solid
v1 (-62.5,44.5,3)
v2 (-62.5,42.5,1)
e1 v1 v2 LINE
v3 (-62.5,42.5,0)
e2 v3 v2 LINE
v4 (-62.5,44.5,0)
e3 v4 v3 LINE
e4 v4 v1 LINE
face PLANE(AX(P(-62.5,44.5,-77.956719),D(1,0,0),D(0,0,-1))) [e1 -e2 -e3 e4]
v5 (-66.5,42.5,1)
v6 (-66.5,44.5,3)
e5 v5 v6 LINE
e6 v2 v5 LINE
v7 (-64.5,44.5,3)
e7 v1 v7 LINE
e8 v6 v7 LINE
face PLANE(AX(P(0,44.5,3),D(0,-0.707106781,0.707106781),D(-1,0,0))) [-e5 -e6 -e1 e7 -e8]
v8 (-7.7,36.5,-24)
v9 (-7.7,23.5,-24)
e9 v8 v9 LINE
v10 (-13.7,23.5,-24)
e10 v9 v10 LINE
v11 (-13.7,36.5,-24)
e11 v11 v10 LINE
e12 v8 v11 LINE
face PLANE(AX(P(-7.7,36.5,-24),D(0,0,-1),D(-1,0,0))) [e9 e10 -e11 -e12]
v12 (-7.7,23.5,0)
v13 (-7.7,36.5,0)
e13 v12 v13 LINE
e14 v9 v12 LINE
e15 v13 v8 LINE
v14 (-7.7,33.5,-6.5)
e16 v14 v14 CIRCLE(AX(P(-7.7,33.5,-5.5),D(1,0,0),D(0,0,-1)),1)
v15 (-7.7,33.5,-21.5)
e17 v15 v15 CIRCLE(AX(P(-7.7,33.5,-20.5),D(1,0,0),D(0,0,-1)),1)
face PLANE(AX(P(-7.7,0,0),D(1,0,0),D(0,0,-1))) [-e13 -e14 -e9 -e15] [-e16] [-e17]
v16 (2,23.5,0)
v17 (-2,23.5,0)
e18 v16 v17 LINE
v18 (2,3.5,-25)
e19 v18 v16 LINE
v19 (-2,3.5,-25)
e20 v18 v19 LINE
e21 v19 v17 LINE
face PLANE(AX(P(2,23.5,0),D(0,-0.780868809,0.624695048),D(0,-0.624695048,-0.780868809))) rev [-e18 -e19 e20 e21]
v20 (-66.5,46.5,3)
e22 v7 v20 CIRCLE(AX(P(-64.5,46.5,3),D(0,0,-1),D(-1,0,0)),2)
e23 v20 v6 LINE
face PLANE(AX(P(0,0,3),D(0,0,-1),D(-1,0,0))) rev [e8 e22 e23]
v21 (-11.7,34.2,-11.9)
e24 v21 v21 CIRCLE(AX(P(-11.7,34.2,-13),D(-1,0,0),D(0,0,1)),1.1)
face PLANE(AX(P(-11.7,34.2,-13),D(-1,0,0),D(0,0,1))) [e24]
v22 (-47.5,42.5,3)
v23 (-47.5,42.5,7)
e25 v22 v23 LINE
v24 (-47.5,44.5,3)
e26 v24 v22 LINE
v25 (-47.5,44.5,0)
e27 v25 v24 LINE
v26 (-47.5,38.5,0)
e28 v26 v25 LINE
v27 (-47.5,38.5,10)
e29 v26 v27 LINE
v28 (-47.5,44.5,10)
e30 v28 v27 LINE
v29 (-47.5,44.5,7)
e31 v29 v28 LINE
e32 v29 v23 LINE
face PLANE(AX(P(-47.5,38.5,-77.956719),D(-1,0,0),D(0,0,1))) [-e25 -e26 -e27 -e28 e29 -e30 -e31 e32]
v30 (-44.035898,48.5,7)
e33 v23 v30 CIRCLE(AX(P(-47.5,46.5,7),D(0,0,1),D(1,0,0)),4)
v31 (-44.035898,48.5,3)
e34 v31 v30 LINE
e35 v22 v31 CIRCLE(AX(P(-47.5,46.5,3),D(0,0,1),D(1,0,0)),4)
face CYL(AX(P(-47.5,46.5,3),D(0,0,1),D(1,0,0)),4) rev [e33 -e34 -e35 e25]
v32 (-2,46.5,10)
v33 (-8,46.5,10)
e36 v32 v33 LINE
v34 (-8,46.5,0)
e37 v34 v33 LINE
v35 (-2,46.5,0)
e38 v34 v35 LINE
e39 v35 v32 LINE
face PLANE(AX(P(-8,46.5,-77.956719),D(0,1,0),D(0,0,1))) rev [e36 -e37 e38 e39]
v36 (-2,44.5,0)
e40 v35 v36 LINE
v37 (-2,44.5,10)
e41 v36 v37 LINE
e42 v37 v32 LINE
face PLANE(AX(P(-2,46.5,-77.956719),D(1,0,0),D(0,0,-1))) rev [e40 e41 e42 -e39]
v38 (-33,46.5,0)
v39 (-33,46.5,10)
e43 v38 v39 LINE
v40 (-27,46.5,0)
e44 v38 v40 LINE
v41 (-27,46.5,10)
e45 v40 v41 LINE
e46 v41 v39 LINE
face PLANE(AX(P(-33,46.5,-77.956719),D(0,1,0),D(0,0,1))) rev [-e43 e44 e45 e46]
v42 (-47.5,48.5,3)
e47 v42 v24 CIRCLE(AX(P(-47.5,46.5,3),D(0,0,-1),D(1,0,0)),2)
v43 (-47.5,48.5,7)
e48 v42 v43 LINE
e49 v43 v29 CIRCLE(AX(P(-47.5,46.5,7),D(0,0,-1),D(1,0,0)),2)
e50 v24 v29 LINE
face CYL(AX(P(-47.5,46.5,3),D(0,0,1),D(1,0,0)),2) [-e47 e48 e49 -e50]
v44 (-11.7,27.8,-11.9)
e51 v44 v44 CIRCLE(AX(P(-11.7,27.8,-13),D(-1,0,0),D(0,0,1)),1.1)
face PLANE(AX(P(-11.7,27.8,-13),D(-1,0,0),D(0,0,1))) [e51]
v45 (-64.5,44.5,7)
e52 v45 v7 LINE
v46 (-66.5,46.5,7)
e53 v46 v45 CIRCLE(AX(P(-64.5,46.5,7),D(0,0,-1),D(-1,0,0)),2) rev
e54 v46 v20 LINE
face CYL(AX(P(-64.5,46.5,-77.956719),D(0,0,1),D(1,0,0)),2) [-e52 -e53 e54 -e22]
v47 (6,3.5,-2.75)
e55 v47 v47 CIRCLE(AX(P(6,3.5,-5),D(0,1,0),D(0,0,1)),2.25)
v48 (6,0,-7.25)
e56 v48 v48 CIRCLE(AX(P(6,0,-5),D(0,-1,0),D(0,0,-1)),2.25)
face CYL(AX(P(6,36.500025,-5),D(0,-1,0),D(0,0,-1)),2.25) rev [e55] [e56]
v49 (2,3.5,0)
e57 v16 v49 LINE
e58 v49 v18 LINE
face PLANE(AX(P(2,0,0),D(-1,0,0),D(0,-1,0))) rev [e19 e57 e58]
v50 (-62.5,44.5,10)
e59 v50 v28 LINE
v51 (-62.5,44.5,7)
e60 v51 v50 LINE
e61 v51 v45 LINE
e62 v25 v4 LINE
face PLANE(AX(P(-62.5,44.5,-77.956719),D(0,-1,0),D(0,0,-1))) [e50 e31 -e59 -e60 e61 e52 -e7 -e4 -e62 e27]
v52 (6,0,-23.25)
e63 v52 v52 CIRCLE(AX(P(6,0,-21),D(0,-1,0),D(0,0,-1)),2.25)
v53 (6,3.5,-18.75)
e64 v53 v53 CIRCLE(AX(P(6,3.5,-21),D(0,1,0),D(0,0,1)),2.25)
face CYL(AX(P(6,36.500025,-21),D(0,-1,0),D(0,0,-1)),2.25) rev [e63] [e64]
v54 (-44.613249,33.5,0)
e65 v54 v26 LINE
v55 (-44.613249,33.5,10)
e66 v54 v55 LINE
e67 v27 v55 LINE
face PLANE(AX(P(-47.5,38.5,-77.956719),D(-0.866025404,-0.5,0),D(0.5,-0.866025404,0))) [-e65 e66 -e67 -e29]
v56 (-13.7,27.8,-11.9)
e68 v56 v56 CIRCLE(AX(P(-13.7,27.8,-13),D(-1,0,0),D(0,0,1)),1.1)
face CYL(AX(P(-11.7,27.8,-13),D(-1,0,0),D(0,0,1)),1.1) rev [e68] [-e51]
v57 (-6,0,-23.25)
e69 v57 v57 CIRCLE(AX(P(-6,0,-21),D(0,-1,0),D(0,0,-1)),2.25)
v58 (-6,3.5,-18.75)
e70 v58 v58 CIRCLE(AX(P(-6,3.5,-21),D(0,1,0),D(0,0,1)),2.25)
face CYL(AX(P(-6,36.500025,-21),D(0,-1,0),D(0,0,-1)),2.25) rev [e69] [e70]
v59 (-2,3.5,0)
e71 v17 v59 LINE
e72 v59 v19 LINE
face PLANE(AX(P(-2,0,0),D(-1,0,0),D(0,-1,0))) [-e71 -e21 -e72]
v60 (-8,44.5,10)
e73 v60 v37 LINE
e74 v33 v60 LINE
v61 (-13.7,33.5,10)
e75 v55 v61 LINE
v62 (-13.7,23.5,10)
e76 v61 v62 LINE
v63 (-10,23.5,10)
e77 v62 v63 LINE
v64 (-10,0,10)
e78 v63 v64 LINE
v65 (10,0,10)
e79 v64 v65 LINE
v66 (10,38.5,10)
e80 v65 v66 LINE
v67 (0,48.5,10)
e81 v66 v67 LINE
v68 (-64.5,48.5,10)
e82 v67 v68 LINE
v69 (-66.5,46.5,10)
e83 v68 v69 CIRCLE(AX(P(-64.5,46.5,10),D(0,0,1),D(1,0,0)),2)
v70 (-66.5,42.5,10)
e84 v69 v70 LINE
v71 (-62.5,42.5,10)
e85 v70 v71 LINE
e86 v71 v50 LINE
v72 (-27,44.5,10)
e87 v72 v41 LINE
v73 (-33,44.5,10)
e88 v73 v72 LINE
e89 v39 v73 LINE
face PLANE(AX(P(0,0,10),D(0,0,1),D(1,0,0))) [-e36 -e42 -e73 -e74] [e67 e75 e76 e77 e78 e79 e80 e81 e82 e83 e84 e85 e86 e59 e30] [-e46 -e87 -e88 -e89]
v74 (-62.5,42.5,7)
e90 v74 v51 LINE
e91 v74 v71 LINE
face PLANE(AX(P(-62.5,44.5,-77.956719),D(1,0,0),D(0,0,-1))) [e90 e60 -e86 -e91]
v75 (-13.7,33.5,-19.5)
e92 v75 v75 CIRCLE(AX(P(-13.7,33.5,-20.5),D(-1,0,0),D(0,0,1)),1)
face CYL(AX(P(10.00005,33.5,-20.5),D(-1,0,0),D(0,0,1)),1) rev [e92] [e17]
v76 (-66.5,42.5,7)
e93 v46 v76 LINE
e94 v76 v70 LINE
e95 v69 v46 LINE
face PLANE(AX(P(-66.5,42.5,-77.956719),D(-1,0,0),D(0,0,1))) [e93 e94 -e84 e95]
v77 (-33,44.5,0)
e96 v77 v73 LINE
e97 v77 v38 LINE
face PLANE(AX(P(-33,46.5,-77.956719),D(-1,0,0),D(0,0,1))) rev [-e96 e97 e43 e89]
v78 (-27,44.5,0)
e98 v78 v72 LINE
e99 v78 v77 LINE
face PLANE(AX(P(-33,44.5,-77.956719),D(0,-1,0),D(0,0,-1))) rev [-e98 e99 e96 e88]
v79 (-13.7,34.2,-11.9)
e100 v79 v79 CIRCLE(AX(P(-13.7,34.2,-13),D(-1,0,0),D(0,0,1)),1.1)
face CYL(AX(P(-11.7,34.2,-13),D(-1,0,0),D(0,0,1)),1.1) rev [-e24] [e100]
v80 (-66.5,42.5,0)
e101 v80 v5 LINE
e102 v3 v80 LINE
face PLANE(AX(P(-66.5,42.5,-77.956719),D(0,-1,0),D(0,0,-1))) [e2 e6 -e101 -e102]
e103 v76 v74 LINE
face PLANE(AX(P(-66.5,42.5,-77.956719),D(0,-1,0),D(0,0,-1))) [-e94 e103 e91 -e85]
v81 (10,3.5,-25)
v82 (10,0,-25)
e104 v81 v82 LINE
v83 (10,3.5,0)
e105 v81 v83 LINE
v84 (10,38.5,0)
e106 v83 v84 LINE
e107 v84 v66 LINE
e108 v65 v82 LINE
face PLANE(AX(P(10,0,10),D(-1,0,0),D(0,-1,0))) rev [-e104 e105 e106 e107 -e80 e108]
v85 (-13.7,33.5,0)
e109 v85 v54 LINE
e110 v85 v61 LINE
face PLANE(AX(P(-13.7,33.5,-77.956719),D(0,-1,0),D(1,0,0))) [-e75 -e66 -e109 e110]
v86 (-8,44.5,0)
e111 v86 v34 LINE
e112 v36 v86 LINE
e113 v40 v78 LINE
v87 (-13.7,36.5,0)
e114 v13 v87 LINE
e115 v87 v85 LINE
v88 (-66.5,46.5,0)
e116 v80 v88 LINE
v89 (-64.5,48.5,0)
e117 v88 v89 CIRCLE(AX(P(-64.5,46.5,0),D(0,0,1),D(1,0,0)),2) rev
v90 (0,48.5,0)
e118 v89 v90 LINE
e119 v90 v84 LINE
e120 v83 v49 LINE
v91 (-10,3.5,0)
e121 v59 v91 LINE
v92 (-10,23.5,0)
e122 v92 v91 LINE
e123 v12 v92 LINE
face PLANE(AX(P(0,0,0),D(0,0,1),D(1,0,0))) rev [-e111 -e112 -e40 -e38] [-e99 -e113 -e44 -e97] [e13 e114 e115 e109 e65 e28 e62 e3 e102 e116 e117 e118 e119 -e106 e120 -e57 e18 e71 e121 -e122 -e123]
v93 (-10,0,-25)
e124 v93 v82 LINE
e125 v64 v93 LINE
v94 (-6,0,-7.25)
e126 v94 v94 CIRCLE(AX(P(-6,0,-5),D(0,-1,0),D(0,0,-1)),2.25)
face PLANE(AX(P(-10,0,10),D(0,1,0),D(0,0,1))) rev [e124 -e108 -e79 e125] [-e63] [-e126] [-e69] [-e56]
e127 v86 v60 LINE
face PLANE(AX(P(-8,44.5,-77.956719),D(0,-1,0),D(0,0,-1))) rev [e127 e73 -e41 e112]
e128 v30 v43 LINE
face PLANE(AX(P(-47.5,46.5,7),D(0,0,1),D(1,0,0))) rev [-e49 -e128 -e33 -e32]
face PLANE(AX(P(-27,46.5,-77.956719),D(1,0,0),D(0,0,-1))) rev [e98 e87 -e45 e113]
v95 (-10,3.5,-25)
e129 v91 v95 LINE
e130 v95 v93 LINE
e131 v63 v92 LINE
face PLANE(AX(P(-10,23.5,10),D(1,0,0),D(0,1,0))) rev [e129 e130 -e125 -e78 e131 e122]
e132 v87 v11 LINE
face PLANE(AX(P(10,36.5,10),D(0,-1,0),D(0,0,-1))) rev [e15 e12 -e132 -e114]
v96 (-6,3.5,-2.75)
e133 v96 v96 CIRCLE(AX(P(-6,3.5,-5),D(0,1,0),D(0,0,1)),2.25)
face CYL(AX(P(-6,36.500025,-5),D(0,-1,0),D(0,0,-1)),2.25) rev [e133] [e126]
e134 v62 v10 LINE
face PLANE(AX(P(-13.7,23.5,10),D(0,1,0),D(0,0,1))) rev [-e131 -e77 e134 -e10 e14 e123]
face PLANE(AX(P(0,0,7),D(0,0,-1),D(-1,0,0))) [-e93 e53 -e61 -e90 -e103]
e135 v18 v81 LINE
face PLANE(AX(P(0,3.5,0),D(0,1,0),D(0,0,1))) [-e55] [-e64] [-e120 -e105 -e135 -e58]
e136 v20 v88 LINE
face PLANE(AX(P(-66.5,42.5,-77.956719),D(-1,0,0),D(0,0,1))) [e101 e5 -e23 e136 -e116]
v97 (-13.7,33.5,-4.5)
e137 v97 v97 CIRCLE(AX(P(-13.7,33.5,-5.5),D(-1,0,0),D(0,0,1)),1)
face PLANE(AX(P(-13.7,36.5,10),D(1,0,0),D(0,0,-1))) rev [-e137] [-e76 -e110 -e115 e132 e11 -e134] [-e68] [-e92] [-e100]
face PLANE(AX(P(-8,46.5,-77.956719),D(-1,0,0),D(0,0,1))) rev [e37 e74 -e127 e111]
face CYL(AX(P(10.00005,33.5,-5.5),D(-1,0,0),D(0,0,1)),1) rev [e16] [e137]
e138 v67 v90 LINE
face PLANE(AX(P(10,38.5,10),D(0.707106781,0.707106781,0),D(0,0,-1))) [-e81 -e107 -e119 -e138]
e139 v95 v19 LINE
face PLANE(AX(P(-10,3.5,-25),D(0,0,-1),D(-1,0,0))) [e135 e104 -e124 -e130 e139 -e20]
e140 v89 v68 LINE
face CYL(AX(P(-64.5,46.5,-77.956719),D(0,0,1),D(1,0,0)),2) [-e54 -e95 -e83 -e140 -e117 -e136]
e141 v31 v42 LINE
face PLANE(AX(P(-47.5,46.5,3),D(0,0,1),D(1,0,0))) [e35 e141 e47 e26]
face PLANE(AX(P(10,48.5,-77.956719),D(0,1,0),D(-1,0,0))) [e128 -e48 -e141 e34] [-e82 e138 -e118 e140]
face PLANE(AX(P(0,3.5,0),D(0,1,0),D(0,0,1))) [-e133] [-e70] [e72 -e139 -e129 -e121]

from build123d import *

# Parameters (mm, degrees)
BOSS_EXTRUDE1_DEPTH = 10
SKETCH6_W           = 20
SKETCH6_H           = 25
BOSS_EXTRUDE3_DEPTH = 3.5
SKETCH8_R           = 2.25
CUT_EXTRUDE2_DEPTH  = 47.313496953
SKETCH9_W           = 24
SKETCH9_H           = 13
BOSS_EXTRUDE4_DEPTH = 6
SKETCH10_R          = 1.1
CUT_EXTRUDE3_DEPTH  = 2
SKETCH11_R          = 1
CUT_EXTRUDE4_DEPTH  = 51.189042629
SKETCH12_W          = 6
SKETCH12_H          = 2
BOSS_EXTRUDE5_DEPTH = 10
SKETCH14_W          = 4
SKETCH14_H          = 2
CUT_EXTRUDE5_DEPTH  = 2
BOSS_EXTRUDE6_DEPTH = 2
FILLET1_R           = 2
CHAMFER1_SIZE       = 2
CHAMFER2_SIZE       = 10


with BuildPart() as part:
    # Sketch1 → Boss-Extrude1 (new body)
    with BuildSketch(Plane.XY):
        Polygon((-13.7, 36.5), (-13.7, 23.5), (-10, 23.5), (-10, 0), (10, 0), (10, 36.5), align=None)
    extrude(amount=BOSS_EXTRUDE1_DEPTH)

    # Sketch6 → Boss-Extrude3 (add)
    with BuildSketch(Plane.XZ):
        with Locations((0, -12.5)):
            Rectangle(SKETCH6_W, SKETCH6_H)
    extrude(amount=-BOSS_EXTRUDE3_DEPTH)

    # Sketch8 → Cut-Extrude2 (cut, through all)
    with BuildSketch(Plane.XZ):
        with Locations(Location((-6, -5, 0), (0, 0, 270))):
            Circle(SKETCH8_R)
        with Locations(Location((6, -5, 0), (0, 0, 270))):
            Circle(SKETCH8_R)
        with Locations(Location((6, -21, 0), (0, 0, 270))):
            Circle(SKETCH8_R)
        with Locations(Location((-6, -21, 0), (0, 0, 270))):
            Circle(SKETCH8_R)
    extrude(amount=-CUT_EXTRUDE2_DEPTH, mode=Mode.SUBTRACT)

    # Sketch9 → Boss-Extrude4 (add)
    with BuildSketch(Plane.ZY.offset(13.7)):
        with Locations((-12, 30)):
            Rectangle(SKETCH9_W, SKETCH9_H)
    extrude(amount=-BOSS_EXTRUDE4_DEPTH)

    # Sketch10 → Cut-Extrude3 (cut)
    with BuildSketch(Plane.ZY.offset(13.7)):
        with Locations((-13, 34.2)):
            Circle(SKETCH10_R)
        with Locations((-13, 27.8)):
            Circle(SKETCH10_R)
    extrude(amount=-CUT_EXTRUDE3_DEPTH, mode=Mode.SUBTRACT)

    # Sketch11 → Cut-Extrude4 (cut, through all)
    with BuildSketch(Plane.ZY.offset(13.7)):
        with Locations((-20.5, 33.5)):
            Circle(SKETCH11_R)
        with Locations((-5.5, 33.5)):
            Circle(SKETCH11_R)
    extrude(amount=-CUT_EXTRUDE4_DEPTH, mode=Mode.SUBTRACT)

    # Sketch12 → Boss-Extrude5 (add)
    with BuildSketch(Plane.XY.offset(10)):
        Polygon((10, 36.5), (-13.7, 36.5), (-13.7, 33.5), (-44.613248654, 33.5), (-47.5, 38.5), (-47.5, 44.5), (-62.5, 44.5), (-62.5, 42.5), (-66.5, 42.5), (-66.5, 48.5), (10, 48.5), align=None)
        with Locations((-30, 45.5)):
            Rectangle(SKETCH12_W, SKETCH12_H, mode=Mode.SUBTRACT)
        with Locations((-5, 45.5)):
            Rectangle(SKETCH12_W, SKETCH12_H, mode=Mode.SUBTRACT)
    extrude(amount=-BOSS_EXTRUDE5_DEPTH)

    # Sketch14 → Cut-Extrude5 (cut, symmetric)
    with BuildSketch(Plane.XY.offset(5)):
        with Locations((-64.5, 43.5)):
            Rectangle(SKETCH14_W, SKETCH14_H)
        with BuildLine():
            Line((-47.5, 44.5), (-47.5, 42.5))
            ThreePointArc((-47.5, 42.5), (-44.035898385, 44.5), (-44.035898385, 48.5))
            Line((-44.035898385, 48.5), (-47.5, 48.5))
            ThreePointArc((-47.5, 48.5), (-45.5, 46.5), (-47.5, 44.5))
        make_face()
    extrude(amount=CUT_EXTRUDE5_DEPTH, both=True, mode=Mode.SUBTRACT)

    # Sketch15 → Boss-Extrude6 (add, symmetric)
    with BuildSketch(Plane(origin=(0, 0, 0), x_dir=(0, 0, -1), z_dir=(1, 0, 0))):
        Polygon((0, 3.5), (25, 3.5), (0, 23.5), align=None)
    extrude(amount=BOSS_EXTRUDE6_DEPTH, both=True)

    # Fillet1
    fillet1_edges = [part.edges().sort_by_distance(p)[0] for p in [
        (-66.5, 44.5, 5),
        (-66.5, 48.5, 5),
    ]]
    fillet(fillet1_edges, radius=FILLET1_R - 0.0001)  # a hair under: the kernel refuses the full size

    # Chamfer1
    chamfer1_edges = [part.edges().sort_by_distance(p)[0] for p in [
        (-64.5, 42.5, 3),
    ]]
    chamfer(chamfer1_edges, length=CHAMFER1_SIZE - 0.0001)  # a hair under: the kernel refuses the full size

    # Chamfer2
    chamfer2_edges = [part.edges().sort_by_distance(p)[0] for p in [
        (10, 48.5, 5),
    ]]
    chamfer(chamfer2_edges, length=CHAMFER2_SIZE)


solid = part.part
